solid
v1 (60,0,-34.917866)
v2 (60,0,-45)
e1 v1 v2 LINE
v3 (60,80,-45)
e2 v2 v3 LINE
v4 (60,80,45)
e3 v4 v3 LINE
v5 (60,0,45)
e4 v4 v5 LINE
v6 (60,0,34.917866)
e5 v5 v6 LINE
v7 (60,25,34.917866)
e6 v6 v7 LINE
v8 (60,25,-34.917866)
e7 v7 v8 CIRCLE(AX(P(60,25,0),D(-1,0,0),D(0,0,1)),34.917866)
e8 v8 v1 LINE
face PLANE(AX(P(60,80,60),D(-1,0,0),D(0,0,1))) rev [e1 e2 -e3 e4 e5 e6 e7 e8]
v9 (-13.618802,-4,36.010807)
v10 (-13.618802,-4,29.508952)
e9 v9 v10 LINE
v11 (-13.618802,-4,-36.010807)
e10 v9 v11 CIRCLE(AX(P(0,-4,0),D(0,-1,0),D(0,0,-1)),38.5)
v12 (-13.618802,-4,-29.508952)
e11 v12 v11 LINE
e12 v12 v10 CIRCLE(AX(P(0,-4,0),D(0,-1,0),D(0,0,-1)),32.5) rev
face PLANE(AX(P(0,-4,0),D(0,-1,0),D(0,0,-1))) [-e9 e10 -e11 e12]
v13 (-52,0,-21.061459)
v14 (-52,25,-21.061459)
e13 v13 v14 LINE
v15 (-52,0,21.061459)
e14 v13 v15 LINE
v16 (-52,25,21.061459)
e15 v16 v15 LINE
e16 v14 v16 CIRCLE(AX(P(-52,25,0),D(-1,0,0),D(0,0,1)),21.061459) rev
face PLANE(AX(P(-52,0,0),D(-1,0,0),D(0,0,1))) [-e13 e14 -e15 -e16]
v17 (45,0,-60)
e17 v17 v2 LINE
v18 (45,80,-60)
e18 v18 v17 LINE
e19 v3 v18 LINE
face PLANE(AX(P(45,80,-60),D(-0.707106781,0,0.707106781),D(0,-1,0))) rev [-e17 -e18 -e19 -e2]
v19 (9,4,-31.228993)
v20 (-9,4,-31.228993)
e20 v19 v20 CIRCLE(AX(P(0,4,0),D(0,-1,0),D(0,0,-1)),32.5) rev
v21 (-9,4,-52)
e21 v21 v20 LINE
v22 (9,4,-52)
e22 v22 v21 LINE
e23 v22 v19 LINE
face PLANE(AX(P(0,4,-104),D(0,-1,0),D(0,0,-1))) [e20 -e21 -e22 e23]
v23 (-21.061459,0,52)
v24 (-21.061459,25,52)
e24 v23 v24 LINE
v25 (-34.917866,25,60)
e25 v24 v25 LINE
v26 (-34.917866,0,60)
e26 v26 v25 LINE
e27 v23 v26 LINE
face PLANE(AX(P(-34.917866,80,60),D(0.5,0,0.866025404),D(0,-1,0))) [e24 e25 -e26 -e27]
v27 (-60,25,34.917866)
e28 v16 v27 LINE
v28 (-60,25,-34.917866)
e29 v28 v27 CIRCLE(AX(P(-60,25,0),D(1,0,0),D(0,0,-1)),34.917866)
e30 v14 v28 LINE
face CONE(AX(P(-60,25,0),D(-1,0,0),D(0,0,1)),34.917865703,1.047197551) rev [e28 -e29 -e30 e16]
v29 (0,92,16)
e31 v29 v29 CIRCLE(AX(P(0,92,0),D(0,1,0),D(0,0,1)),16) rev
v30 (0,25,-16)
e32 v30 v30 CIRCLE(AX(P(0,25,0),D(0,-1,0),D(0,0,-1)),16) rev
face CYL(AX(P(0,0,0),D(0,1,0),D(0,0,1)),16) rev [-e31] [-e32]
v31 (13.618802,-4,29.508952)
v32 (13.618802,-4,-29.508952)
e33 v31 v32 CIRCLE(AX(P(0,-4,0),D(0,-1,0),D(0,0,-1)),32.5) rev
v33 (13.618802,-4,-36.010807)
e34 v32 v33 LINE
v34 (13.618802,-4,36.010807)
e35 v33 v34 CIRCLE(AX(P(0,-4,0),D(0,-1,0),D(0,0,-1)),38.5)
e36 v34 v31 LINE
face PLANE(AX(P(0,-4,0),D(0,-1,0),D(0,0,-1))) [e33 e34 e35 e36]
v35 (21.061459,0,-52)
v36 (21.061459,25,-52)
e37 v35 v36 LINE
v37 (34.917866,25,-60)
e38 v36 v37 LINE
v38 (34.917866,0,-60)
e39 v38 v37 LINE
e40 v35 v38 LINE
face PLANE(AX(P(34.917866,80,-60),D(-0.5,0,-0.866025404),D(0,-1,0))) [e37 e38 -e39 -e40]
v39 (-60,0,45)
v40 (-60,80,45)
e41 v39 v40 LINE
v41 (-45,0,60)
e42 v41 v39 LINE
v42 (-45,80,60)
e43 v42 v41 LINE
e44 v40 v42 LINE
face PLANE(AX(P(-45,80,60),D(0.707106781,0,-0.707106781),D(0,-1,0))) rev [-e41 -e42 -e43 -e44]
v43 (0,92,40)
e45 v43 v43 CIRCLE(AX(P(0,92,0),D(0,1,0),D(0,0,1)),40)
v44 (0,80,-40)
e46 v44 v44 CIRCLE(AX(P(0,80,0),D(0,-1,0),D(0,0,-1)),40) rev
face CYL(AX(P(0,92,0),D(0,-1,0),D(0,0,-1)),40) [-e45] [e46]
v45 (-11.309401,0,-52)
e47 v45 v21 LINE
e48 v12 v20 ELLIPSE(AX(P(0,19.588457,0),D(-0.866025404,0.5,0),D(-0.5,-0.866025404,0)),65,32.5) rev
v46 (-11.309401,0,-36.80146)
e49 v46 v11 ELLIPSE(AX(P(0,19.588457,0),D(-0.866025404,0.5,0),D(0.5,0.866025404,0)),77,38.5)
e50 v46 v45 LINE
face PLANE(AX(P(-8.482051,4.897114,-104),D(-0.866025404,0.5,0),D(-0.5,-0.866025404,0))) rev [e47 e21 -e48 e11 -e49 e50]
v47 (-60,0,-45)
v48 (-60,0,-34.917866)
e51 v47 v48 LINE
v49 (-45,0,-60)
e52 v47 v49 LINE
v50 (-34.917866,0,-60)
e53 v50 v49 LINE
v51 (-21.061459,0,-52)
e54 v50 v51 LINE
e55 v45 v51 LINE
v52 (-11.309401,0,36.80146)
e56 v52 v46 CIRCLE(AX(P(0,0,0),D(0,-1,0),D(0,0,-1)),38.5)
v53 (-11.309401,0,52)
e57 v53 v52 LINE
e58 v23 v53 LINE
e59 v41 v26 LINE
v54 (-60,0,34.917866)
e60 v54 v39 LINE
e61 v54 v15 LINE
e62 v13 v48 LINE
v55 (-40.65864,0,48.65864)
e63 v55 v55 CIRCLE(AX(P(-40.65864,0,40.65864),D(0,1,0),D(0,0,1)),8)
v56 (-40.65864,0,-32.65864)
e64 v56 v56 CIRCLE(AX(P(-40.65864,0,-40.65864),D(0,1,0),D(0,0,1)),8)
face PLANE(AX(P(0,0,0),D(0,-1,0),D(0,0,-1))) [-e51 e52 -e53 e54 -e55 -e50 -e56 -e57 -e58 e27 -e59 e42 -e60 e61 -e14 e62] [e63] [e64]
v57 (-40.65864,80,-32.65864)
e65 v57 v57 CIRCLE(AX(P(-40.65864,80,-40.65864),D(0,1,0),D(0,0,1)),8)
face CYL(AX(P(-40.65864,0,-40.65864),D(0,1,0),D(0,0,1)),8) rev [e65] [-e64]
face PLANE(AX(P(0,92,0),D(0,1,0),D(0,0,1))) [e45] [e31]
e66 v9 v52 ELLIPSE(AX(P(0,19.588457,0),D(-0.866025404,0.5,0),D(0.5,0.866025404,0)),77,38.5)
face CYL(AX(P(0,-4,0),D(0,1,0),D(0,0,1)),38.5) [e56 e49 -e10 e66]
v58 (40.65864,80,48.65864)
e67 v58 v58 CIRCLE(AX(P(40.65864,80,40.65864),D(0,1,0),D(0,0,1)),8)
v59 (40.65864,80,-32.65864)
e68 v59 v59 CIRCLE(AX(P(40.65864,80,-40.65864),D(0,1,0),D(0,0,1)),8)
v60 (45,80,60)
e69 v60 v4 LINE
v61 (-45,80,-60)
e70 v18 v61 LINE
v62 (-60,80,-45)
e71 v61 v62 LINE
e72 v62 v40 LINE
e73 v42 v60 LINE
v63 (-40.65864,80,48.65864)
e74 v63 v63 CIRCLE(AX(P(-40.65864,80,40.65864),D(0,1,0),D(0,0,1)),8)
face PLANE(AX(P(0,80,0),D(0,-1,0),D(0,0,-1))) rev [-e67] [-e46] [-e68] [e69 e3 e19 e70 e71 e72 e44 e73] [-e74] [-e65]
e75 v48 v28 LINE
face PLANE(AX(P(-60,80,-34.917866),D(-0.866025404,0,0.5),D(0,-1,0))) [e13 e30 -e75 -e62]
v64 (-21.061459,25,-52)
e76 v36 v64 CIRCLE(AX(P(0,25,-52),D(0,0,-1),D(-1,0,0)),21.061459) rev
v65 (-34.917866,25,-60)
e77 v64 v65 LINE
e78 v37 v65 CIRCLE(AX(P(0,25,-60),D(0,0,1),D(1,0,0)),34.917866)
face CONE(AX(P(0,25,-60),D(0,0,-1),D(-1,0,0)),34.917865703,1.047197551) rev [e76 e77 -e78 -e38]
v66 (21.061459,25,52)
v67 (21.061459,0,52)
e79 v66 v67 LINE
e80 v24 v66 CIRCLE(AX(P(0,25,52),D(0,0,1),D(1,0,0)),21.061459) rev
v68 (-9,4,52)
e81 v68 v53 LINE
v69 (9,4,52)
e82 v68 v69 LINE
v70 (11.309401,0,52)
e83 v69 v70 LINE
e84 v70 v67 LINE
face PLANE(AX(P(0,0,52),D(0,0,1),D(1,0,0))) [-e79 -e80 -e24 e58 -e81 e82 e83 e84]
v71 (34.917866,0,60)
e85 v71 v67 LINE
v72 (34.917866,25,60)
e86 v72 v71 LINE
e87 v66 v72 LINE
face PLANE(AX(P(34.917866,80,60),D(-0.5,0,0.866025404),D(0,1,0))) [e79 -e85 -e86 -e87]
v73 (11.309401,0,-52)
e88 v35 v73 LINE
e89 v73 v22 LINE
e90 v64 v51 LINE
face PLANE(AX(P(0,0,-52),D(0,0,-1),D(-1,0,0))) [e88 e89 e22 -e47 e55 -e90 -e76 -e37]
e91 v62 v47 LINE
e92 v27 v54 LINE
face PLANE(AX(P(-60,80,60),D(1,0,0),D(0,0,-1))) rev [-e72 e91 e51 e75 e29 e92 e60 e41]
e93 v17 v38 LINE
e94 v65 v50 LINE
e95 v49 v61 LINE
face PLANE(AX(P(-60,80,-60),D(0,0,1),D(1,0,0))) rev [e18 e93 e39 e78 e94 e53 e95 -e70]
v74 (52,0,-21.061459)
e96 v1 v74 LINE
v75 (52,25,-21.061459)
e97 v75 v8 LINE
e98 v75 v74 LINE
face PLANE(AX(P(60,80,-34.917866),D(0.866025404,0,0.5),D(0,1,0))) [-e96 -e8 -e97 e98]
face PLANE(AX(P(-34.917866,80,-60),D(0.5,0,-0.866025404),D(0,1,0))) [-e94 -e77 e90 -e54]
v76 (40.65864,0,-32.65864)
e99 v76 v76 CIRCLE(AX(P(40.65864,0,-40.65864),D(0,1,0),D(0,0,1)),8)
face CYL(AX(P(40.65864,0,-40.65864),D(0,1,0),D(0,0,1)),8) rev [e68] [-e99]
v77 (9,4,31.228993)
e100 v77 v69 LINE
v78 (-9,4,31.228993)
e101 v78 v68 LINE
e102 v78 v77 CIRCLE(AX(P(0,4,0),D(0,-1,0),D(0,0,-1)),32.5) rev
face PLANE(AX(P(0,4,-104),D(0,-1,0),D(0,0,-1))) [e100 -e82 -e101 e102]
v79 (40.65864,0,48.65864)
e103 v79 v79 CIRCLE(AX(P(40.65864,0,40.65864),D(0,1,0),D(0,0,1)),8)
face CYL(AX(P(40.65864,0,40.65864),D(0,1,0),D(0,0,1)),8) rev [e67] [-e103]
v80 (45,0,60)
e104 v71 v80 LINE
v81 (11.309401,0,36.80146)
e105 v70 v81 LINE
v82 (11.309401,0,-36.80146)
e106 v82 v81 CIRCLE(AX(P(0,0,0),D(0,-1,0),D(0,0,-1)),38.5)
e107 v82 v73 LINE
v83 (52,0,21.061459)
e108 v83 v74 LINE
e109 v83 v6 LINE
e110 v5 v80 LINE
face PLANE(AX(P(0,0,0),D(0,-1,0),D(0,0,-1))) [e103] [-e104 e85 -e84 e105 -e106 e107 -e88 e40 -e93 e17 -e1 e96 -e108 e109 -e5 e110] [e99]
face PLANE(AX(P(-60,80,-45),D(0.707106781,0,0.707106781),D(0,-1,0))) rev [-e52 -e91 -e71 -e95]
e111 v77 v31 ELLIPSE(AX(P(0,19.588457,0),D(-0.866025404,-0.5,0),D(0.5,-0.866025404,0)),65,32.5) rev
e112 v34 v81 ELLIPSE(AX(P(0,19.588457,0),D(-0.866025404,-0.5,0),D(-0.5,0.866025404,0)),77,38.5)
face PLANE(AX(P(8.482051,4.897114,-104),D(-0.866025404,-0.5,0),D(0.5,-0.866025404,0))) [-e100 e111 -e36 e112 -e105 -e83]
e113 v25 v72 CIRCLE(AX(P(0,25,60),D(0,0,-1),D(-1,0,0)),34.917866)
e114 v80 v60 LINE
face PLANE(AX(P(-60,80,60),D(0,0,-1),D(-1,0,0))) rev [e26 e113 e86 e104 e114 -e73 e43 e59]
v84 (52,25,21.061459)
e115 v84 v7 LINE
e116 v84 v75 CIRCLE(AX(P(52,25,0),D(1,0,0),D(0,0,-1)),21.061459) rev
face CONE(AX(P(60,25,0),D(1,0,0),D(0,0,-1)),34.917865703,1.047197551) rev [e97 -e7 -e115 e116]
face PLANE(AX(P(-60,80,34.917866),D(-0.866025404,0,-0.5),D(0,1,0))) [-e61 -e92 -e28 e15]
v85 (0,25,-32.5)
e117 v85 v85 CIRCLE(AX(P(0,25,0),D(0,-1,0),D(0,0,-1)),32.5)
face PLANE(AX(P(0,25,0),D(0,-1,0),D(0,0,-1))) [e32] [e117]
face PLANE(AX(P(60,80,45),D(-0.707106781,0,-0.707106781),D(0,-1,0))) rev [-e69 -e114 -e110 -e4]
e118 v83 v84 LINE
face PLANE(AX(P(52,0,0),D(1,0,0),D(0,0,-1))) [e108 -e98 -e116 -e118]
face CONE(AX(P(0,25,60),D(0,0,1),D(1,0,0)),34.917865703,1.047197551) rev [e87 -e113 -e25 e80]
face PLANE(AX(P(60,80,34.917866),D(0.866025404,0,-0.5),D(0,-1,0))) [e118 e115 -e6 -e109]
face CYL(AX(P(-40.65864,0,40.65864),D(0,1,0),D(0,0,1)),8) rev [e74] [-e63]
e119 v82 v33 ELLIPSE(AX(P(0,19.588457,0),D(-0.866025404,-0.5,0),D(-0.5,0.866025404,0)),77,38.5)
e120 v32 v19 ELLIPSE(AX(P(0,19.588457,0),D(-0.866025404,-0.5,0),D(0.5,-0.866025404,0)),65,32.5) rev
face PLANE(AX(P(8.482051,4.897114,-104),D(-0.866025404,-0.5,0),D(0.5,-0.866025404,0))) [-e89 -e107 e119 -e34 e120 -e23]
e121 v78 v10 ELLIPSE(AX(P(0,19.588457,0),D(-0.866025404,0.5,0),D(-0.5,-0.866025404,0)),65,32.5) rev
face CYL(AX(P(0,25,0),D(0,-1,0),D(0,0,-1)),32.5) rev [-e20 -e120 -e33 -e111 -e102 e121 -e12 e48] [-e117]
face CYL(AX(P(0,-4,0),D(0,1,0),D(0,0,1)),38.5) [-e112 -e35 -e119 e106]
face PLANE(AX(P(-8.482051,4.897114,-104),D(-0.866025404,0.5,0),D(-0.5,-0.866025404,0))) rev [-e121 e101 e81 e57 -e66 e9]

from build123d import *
from OCP.BRepFilletAPI import BRepFilletAPI_MakeChamfer

# Parameters (mm, degrees)
SKETCH1_W                      = 120
SKETCH1_H                      = 120
BOSS_EXTRUDE1_DEPTH            = 80
CHAMFER1_SIZE                  = 15
SKETCH2_R                      = 8
SKETCH2_R_2                    = 16
CUT_EXTRUDE1_DEPTH             = 80
CUT_EXTRUDE2_DEPTH             = 8
CHAMFER3_SIZE                  = 13.856406461
CHAMFER3_SIZE_2                = 8
CIRPATTERN2_COUNT              = 4
CHAMFER3_OF_CIRPATTERN2_SIZE   = 13.856406461
CHAMFER3_OF_CIRPATTERN2_SIZE_2 = 8
BOSS_EXTRUDE2_START            = 12
SKETCH5_R                      = 40
SKETCH5_R_2                    = 16
BOSS_EXTRUDE2_DEPTH            = 12
SKETCH6_R                      = 32.5
CUT_EXTRUDE3_DEPTH             = 25
BOSS_EXTRUDE3_START            = 4
SKETCH17_R                     = 38.5
SKETCH17_R_2                   = 32.5
BOSS_EXTRUDE3_DEPTH            = 4
CUT_EXTRUDE4_DEPTH             = 156


with BuildPart() as part:
    # Sketch1 → Boss-Extrude1 (new body)
    with BuildSketch(Plane(origin=(0, 0, 0), x_dir=(1, 0, 0), z_dir=(0, 1, 0))):
        Rectangle(SKETCH1_W, SKETCH1_H)
    extrude(amount=BOSS_EXTRUDE1_DEPTH)

    # Chamfer1
    chamfer1_edges = [part.edges().sort_by_distance(p)[0] for p in [
        (60, 40, 60),
        (-60, 40, 60),
        (-60, 40, -60),
        (60, 40, -60),
    ]]
    chamfer(chamfer1_edges, length=CHAMFER1_SIZE)

    # Sketch2 → Cut-Extrude1 (cut)
    with BuildSketch(Plane(origin=(0, 80, 0), x_dir=(1, 0, 0), z_dir=(0, 1, 0))):
        with Locations(Location((-40.658639918, 40.658639918, 0), (0, 0, 270))):
            Circle(SKETCH2_R)
        with Locations(Location((40.658639918, 40.658639918, 0), (0, 0, 270))):
            Circle(SKETCH2_R)
        with Locations(Location((40.658639918, -40.658639918, 0), (0, 0, 270))):
            Circle(SKETCH2_R)
        with Locations(Location((-40.658639918, -40.658639918, 0), (0, 0, 270))):
            Circle(SKETCH2_R)
        with Locations(Location((0, 0, 0), (0, 0, 270))):
            Circle(SKETCH2_R_2)
    extrude(amount=-CUT_EXTRUDE1_DEPTH, mode=Mode.SUBTRACT)

    # Sketch3 → Cut-Extrude2 (cut)
    with BuildSketch(Plane(origin=(60, 0, 0), x_dir=(0, 0, -1), z_dir=(1, 0, 0))):
        with BuildLine():
            Line((-21.061459243, 25), (-21.061459243, 0))
            Line((-21.061459243, 0), (0, 0))
            Line((0, 0), (0, 46.061459243))
            ThreePointArc((0, 46.061459243), (-14.892700652, 39.892700652), (-21.061459243, 25))
        make_face()
        with BuildLine():
            Line((0, 46.061459243), (0, 0))
            Line((0, 0), (21.061459243, 0))
            Line((21.061459243, 0), (21.061459243, 25))
            ThreePointArc((21.061459243, 25), (14.892700652, 39.892700652), (0, 46.061459243))
        make_face()
    cut_extrude2 = extrude(amount=-CUT_EXTRUDE2_DEPTH, mode=Mode.SUBTRACT)

    # Chamfer3
    chamfer3_edges_1 = [part.edges().sort_by_distance(p)[0] for p in [
        (60, 12.5, 21.061459243),
    ]]
    chamfer3_side_1 = [part.faces().sort_by_distance(p)[0] for p in [
        (60, 12.5, 21.221459243),
    ]]
    chamfer3_edges_2 = [part.edges().sort_by_distance(p)[0] for p in [
        (60, 46.061459243, 0),
    ]]
    chamfer3_side_2 = [part.faces().sort_by_distance(p)[0] for p in [
        (60, 46.221459243, 0),
    ]]
    chamfer3_edges_3 = [part.edges().sort_by_distance(p)[0] for p in [
        (60, 12.5, -21.061459243),
    ]]
    chamfer3_side_3 = [part.faces().sort_by_distance(p)[0] for p in [
        (60, 12.5, -21.221459243),
    ]]
    chamfer3 = BRepFilletAPI_MakeChamfer(part.part.solid().wrapped)
    for e in chamfer3_edges_1:
        chamfer3.Add(CHAMFER3_SIZE - 0.0001, CHAMFER3_SIZE_2 - 0.0001, e.wrapped, chamfer3_side_1[0].wrapped)
    for e in chamfer3_edges_2:
        chamfer3.Add(CHAMFER3_SIZE - 0.0001, CHAMFER3_SIZE_2 - 0.0001, e.wrapped, chamfer3_side_2[0].wrapped)
    for e in chamfer3_edges_3:
        chamfer3.Add(CHAMFER3_SIZE - 0.0001, CHAMFER3_SIZE_2 - 0.0001, e.wrapped, chamfer3_side_3[0].wrapped)
    add(Compound.cast(chamfer3.Shape()), mode=Mode.REPLACE)  # a hair under: the kernel refuses the full size

    # CirPattern2: Cut-Extrude2 ×4 about axis
    cirpattern2_axis = Axis((0, 0, 0), (0, 1, 0))
    for i in range(1, CIRPATTERN2_COUNT):
        add(cut_extrude2.rotate(cirpattern2_axis, i * 360 / CIRPATTERN2_COUNT), mode=Mode.SUBTRACT)

    # Chamfer3 of CirPattern2
    chamfer3_of_cirpattern2_edges_1 = [part.edges().sort_by_distance(p)[0] for p in [
        (21.061459243, 12.5, -60),
    ]]
    chamfer3_of_cirpattern2_side_1 = [part.faces().sort_by_distance(p)[0] for p in [
        (21.221459243, 12.5, -60),
    ]]
    chamfer3_of_cirpattern2_edges_2 = [part.edges().sort_by_distance(p)[0] for p in [
        (0, 46.061459243, -60),
    ]]
    chamfer3_of_cirpattern2_side_2 = [part.faces().sort_by_distance(p)[0] for p in [
        (0, 46.221459243, -60),
    ]]
    chamfer3_of_cirpattern2_edges_3 = [part.edges().sort_by_distance(p)[0] for p in [
        (-21.061459243, 12.5, -60),
    ]]
    chamfer3_of_cirpattern2_side_3 = [part.faces().sort_by_distance(p)[0] for p in [
        (-21.221459243, 12.5, -60),
    ]]
    chamfer3_of_cirpattern2_edges_4 = [part.edges().sort_by_distance(p)[0] for p in [
        (-60, 12.5, -21.061459243),
    ]]
    chamfer3_of_cirpattern2_side_4 = [part.faces().sort_by_distance(p)[0] for p in [
        (-60, 12.5, -21.221459243),
    ]]
    chamfer3_of_cirpattern2_edges_5 = [part.edges().sort_by_distance(p)[0] for p in [
        (-60, 46.061459243, 0),
    ]]
    chamfer3_of_cirpattern2_side_5 = [part.faces().sort_by_distance(p)[0] for p in [
        (-60, 46.221459243, 0),
    ]]
    chamfer3_of_cirpattern2_edges_6 = [part.edges().sort_by_distance(p)[0] for p in [
        (-60, 12.5, 21.061459243),
    ]]
    chamfer3_of_cirpattern2_side_6 = [part.faces().sort_by_distance(p)[0] for p in [
        (-60, 12.5, 21.221459243),
    ]]
    chamfer3_of_cirpattern2_edges_7 = [part.edges().sort_by_distance(p)[0] for p in [
        (-21.061459243, 12.5, 60),
    ]]
    chamfer3_of_cirpattern2_side_7 = [part.faces().sort_by_distance(p)[0] for p in [
        (-21.221459243, 12.5, 60),
    ]]
    chamfer3_of_cirpattern2_edges_8 = [part.edges().sort_by_distance(p)[0] for p in [
        (0, 46.061459243, 60),
    ]]
    chamfer3_of_cirpattern2_side_8 = [part.faces().sort_by_distance(p)[0] for p in [
        (0, 46.221459243, 60),
    ]]
    chamfer3_of_cirpattern2_edges_9 = [part.edges().sort_by_distance(p)[0] for p in [
        (21.061459243, 12.5, 60),
    ]]
    chamfer3_of_cirpattern2_side_9 = [part.faces().sort_by_distance(p)[0] for p in [
        (21.221459243, 12.5, 60),
    ]]
    chamfer3_of_cirpattern2 = BRepFilletAPI_MakeChamfer(part.part.solid().wrapped)
    for e in chamfer3_of_cirpattern2_edges_1:
        chamfer3_of_cirpattern2.Add(CHAMFER3_OF_CIRPATTERN2_SIZE - 0.0001, CHAMFER3_OF_CIRPATTERN2_SIZE_2 - 0.0001, e.wrapped, chamfer3_of_cirpattern2_side_1[0].wrapped)
    for e in chamfer3_of_cirpattern2_edges_2:
        chamfer3_of_cirpattern2.Add(CHAMFER3_OF_CIRPATTERN2_SIZE - 0.0001, CHAMFER3_OF_CIRPATTERN2_SIZE_2 - 0.0001, e.wrapped, chamfer3_of_cirpattern2_side_2[0].wrapped)
    for e in chamfer3_of_cirpattern2_edges_3:
        chamfer3_of_cirpattern2.Add(CHAMFER3_OF_CIRPATTERN2_SIZE - 0.0001, CHAMFER3_OF_CIRPATTERN2_SIZE_2 - 0.0001, e.wrapped, chamfer3_of_cirpattern2_side_3[0].wrapped)
    for e in chamfer3_of_cirpattern2_edges_4:
        chamfer3_of_cirpattern2.Add(CHAMFER3_OF_CIRPATTERN2_SIZE - 0.0001, CHAMFER3_OF_CIRPATTERN2_SIZE_2 - 0.0001, e.wrapped, chamfer3_of_cirpattern2_side_4[0].wrapped)
    for e in chamfer3_of_cirpattern2_edges_5:
        chamfer3_of_cirpattern2.Add(CHAMFER3_OF_CIRPATTERN2_SIZE - 0.0001, CHAMFER3_OF_CIRPATTERN2_SIZE_2 - 0.0001, e.wrapped, chamfer3_of_cirpattern2_side_5[0].wrapped)
    for e in chamfer3_of_cirpattern2_edges_6:
        chamfer3_of_cirpattern2.Add(CHAMFER3_OF_CIRPATTERN2_SIZE - 0.0001, CHAMFER3_OF_CIRPATTERN2_SIZE_2 - 0.0001, e.wrapped, chamfer3_of_cirpattern2_side_6[0].wrapped)
    for e in chamfer3_of_cirpattern2_edges_7:
        chamfer3_of_cirpattern2.Add(CHAMFER3_OF_CIRPATTERN2_SIZE - 0.0001, CHAMFER3_OF_CIRPATTERN2_SIZE_2 - 0.0001, e.wrapped, chamfer3_of_cirpattern2_side_7[0].wrapped)
    for e in chamfer3_of_cirpattern2_edges_8:
        chamfer3_of_cirpattern2.Add(CHAMFER3_OF_CIRPATTERN2_SIZE - 0.0001, CHAMFER3_OF_CIRPATTERN2_SIZE_2 - 0.0001, e.wrapped, chamfer3_of_cirpattern2_side_8[0].wrapped)
    for e in chamfer3_of_cirpattern2_edges_9:
        chamfer3_of_cirpattern2.Add(CHAMFER3_OF_CIRPATTERN2_SIZE - 0.0001, CHAMFER3_OF_CIRPATTERN2_SIZE_2 - 0.0001, e.wrapped, chamfer3_of_cirpattern2_side_9[0].wrapped)
    add(Compound.cast(chamfer3_of_cirpattern2.Shape()), mode=Mode.REPLACE)  # a hair under: the kernel refuses the full size

    # Sketch5 → Boss-Extrude2 (add)
    with BuildSketch(Plane(origin=(0, 80, 0), x_dir=(1, 0, 0), z_dir=(0, 1, 0)).offset(BOSS_EXTRUDE2_START)):
        with Locations(Location((0, 0, 0), (0, 0, 90))):
            Circle(SKETCH5_R)
        with Locations(Location((0, 0, 0), (0, 0, 270))):
            Circle(SKETCH5_R_2, mode=Mode.SUBTRACT)
    extrude(amount=-BOSS_EXTRUDE2_DEPTH)

    # Sketch6 → Cut-Extrude3 (cut)
    with BuildSketch(Plane.XZ):
        with Locations(Location((0, 0, 0), (0, 0, 270))):
            Circle(SKETCH6_R)
    extrude(amount=-CUT_EXTRUDE3_DEPTH, mode=Mode.SUBTRACT)

    # Sketch17 → Boss-Extrude3 (add)
    with BuildSketch(Plane.XZ.offset(BOSS_EXTRUDE3_START)):
        with Locations(Location((0, 0, 0), (0, 0, 270))):
            Circle(SKETCH17_R)
        with Locations(Location((0, 0, 0), (0, 0, 270))):
            Circle(SKETCH17_R_2, mode=Mode.SUBTRACT)
    extrude(amount=-BOSS_EXTRUDE3_DEPTH)

    # Sketch18 → Cut-Extrude4 (cut)
    with BuildSketch(Plane.XY.offset(52)):
        Polygon((9, 4), (0, 4), (0, 0), (11.309401077, 0), align=None)
        Polygon((0, 4), (-9, 4), (-11.309401077, 0), (0, 0), align=None)
        Polygon((0, 0), (-11.309401077, 0), (-13.618802154, -4), (0, -4), align=None)
        Polygon((11.309401077, 0), (0, 0), (0, -4), (13.618802154, -4), align=None)
    extrude(amount=-CUT_EXTRUDE4_DEPTH, mode=Mode.SUBTRACT)


solid = part.part
